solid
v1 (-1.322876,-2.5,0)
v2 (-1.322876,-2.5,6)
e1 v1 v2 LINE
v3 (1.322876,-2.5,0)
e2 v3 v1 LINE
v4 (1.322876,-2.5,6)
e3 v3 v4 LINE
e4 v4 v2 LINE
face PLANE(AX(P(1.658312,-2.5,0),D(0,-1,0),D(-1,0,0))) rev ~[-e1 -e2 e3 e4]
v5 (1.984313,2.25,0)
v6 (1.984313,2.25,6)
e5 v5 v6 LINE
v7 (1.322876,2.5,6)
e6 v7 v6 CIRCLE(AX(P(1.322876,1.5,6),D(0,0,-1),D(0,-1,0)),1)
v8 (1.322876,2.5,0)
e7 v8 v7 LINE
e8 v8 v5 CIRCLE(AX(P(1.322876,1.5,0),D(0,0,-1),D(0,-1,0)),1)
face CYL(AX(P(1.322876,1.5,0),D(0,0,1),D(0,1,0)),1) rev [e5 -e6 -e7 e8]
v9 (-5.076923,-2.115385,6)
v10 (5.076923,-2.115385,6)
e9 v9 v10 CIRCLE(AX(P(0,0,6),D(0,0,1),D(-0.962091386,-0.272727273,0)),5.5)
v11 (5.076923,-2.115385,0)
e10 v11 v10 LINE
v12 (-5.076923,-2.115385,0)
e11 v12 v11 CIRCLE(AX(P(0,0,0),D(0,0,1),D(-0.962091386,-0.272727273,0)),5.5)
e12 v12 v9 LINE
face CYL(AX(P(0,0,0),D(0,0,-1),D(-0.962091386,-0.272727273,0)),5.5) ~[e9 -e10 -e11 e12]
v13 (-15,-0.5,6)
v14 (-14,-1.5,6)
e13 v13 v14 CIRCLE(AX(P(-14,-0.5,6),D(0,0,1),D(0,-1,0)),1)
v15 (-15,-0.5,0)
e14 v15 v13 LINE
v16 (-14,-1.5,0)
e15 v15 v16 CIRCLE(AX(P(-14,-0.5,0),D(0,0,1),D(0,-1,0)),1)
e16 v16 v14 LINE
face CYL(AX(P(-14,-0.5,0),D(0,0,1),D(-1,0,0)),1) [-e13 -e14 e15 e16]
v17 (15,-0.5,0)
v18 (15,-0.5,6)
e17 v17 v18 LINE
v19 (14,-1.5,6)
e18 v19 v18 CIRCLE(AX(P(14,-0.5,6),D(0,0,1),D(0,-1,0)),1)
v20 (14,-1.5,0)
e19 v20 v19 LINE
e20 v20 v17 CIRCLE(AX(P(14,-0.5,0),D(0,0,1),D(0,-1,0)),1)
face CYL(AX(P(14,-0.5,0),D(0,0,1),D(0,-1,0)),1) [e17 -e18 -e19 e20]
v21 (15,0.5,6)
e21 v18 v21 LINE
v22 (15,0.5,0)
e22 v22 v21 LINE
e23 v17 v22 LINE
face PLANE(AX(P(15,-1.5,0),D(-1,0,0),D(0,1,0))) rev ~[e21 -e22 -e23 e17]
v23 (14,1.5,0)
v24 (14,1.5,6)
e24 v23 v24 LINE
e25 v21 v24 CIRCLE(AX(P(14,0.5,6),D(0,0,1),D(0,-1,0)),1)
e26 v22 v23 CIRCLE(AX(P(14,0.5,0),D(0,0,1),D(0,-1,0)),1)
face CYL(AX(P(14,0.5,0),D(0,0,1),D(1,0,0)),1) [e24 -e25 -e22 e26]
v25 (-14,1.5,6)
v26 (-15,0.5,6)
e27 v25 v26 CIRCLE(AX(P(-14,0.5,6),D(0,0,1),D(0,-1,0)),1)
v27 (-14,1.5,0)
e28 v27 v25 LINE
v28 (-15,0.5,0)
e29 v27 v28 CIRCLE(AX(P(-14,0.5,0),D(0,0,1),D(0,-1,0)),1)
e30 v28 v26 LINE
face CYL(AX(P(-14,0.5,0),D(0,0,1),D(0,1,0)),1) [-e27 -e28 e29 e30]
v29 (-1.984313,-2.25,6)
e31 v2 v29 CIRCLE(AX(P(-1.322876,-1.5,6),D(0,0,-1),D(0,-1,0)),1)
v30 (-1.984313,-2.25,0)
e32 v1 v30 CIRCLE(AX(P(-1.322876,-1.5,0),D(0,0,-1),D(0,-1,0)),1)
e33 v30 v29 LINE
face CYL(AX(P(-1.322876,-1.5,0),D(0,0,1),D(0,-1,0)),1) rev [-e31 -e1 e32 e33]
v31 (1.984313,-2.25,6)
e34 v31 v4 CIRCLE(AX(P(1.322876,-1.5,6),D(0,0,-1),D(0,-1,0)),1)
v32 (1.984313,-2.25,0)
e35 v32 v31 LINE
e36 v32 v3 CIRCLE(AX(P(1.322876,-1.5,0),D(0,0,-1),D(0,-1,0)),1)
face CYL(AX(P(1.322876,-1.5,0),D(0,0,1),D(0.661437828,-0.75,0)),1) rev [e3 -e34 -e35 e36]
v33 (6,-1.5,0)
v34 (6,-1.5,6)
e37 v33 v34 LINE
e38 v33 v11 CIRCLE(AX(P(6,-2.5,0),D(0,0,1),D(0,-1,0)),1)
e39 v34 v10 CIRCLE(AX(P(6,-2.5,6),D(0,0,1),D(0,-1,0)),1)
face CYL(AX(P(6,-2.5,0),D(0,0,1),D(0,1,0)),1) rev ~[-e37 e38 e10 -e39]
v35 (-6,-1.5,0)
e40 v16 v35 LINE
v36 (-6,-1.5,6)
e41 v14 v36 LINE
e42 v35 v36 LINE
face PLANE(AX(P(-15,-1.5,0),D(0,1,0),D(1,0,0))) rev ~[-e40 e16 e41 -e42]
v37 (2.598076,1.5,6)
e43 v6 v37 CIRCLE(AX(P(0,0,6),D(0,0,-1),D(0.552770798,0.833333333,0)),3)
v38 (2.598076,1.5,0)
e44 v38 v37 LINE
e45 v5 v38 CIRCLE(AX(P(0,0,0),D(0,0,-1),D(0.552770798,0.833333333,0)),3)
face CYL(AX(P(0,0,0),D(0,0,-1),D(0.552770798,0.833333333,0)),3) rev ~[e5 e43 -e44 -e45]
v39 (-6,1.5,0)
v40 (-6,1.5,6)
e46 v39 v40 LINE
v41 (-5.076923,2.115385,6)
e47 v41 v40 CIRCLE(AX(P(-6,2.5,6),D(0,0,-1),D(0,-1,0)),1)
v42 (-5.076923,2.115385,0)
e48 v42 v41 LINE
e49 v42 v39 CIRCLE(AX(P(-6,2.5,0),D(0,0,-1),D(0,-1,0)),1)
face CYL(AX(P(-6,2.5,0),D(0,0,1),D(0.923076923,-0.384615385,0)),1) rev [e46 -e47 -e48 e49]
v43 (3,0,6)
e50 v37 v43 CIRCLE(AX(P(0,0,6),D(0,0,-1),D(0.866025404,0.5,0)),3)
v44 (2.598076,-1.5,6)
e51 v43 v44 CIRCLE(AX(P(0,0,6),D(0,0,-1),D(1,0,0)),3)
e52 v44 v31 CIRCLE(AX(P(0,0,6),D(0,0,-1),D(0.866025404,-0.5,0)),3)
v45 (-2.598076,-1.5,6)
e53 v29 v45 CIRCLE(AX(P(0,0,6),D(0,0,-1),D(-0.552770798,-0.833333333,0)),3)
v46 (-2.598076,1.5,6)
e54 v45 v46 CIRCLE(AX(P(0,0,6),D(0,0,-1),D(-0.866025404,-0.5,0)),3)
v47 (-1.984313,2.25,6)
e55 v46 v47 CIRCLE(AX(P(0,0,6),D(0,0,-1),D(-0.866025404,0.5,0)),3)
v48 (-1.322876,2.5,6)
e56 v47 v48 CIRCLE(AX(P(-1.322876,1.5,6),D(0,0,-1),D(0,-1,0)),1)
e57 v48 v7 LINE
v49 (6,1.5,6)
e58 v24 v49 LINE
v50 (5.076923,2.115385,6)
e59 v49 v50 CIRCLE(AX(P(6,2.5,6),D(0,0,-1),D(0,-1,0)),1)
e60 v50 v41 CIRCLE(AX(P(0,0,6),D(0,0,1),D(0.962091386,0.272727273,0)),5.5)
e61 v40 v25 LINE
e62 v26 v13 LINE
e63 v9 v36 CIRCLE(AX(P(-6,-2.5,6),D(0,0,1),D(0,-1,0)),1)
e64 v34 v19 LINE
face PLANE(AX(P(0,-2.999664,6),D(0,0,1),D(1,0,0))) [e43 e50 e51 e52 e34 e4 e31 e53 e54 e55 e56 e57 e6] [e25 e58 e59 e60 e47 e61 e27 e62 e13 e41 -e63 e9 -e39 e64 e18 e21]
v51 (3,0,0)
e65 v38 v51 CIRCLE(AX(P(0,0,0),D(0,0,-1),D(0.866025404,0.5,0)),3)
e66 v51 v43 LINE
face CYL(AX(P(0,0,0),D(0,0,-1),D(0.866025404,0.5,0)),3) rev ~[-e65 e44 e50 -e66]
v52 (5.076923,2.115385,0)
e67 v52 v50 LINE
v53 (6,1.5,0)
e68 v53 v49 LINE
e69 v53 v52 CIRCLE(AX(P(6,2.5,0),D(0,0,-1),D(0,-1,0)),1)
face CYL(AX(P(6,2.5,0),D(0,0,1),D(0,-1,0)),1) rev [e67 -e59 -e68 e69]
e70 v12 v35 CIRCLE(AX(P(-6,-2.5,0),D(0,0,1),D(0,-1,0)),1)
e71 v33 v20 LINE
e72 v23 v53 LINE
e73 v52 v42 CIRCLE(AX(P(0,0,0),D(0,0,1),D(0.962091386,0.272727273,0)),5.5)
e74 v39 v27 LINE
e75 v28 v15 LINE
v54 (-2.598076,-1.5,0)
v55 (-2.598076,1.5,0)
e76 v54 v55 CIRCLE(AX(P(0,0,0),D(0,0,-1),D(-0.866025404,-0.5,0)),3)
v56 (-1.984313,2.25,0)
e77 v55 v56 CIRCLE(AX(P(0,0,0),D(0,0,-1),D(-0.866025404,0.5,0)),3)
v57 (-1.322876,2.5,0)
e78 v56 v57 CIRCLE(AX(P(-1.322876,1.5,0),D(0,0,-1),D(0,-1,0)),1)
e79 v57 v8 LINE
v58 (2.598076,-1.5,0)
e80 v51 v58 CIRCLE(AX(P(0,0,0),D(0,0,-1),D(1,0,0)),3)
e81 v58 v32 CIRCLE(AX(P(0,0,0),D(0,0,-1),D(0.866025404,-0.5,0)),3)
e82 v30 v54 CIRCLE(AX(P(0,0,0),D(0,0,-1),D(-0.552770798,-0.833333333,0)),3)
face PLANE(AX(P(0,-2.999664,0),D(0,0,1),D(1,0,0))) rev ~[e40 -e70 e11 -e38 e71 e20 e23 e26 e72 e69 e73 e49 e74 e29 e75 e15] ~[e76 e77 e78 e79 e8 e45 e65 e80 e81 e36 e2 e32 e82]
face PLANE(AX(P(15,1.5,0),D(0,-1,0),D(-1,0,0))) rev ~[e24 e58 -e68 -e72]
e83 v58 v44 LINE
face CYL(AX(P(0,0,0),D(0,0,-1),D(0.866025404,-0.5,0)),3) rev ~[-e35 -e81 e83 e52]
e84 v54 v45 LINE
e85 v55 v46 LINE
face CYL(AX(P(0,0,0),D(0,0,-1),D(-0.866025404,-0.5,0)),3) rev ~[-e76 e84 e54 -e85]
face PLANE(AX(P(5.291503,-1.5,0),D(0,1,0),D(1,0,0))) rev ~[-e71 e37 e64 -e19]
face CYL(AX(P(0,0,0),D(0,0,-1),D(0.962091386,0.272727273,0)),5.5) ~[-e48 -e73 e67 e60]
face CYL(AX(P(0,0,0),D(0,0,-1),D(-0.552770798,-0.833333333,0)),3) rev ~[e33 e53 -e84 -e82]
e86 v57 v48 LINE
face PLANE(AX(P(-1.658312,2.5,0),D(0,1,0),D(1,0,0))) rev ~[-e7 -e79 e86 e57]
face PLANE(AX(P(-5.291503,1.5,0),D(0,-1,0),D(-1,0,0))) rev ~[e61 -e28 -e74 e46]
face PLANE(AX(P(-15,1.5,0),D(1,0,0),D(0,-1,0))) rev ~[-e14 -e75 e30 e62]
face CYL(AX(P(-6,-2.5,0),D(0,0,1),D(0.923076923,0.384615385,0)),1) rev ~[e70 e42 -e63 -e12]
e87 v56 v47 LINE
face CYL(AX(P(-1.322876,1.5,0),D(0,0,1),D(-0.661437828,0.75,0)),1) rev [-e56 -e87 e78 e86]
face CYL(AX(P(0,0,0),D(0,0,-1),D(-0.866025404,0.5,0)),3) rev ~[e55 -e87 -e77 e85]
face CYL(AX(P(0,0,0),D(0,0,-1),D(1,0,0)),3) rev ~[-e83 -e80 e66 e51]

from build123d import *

# Parameters (mm, degrees)
F1_DEPTH = 6
F2_R     = 1
F3_R     = 1


with BuildPart() as f1:
    # F0 (on Top) → F1 (new body)
    with BuildSketch(Plane.XY):
        with BuildLine():
            ThreePointArc((-5.2915026221, -1.5), (0, -5.5), (5.2915026221, -1.5))
            Line((5.2915026221, -1.5), (2.5980762114, -1.5))
            ThreePointArc((2.5980762114, -1.5), (2.1861406616, -2.0544558909), (1.6583123952, -2.5))
            ThreePointArc((1.6583123952, -2.5), (0, -3), (-1.6583123952, -2.5))
            ThreePointArc((-1.6583123952, -2.5), (-2.1861406616, -2.0544558909), (-2.5980762114, -1.5))
            Line((-2.5980762114, -1.5), (-5.2915026221, -1.5))
        make_face()
        with BuildLine():
            ThreePointArc((-5.2915026221, -1.5), (-5.5, 0), (-5.2915026221, 1.5))
            Line((-5.2915026221, 1.5), (-15, 1.5))
            Line((-15, 1.5), (-15, -1.5))
            Line((-15, -1.5), (-5.2915026221, -1.5))
        make_face()
        with BuildLine():
            Line((-2.5980762114, 1.5), (-5.2915026221, 1.5))
            ThreePointArc((-5.2915026221, 1.5), (-5.5, 0), (-5.2915026221, -1.5))
            Line((-5.2915026221, -1.5), (-2.5980762114, -1.5))
            ThreePointArc((-2.5980762114, -1.5), (-3, 0), (-2.5980762114, 1.5))
        make_face()
        with BuildLine():
            ThreePointArc((5.2915026221, 1.5), (5.4476262914, 0.7572105316), (5.5, 0))
            ThreePointArc((5.5, 0), (5.4476262914, -0.7572105316), (5.2915026221, -1.5))
            Line((5.2915026221, -1.5), (15, -1.5))
            Line((15, -1.5), (15, 1.5))
            Line((15, 1.5), (5.2915026221, 1.5))
        make_face()
        with BuildLine():
            ThreePointArc((5.2915026221, -1.5), (5.4476262914, -0.7572105316), (5.5, 0))
            ThreePointArc((5.5, 0), (5.4476262914, 0.7572105316), (5.2915026221, 1.5))
            Line((5.2915026221, 1.5), (2.5980762114, 1.5))
            ThreePointArc((2.5980762114, 1.5), (2.8977774789, 0.7764571353), (3, 0))
            ThreePointArc((3, 0), (2.8977774789, -0.7764571353), (2.5980762114, -1.5))
            Line((2.5980762114, -1.5), (5.2915026221, -1.5))
        make_face()
        with BuildLine():
            Line((2.5980762114, 1.5), (5.2915026221, 1.5))
            ThreePointArc((5.2915026221, 1.5), (0, 5.5), (-5.2915026221, 1.5))
            Line((-5.2915026221, 1.5), (-2.5980762114, 1.5))
            ThreePointArc((-2.5980762114, 1.5), (-2.1861406616, 2.0544558909), (-1.6583123952, 2.5))
            ThreePointArc((-1.6583123952, 2.5), (0, 3), (1.6583123952, 2.5))
            ThreePointArc((1.6583123952, 2.5), (2.1861406616, 2.0544558909), (2.5980762114, 1.5))
        make_face()
        with BuildLine():
            Line((-1.6583123952, 2.5), (1.6583123952, 2.5))
            ThreePointArc((1.6583123952, 2.5), (0, 3), (-1.6583123952, 2.5))
        make_face()
        with BuildLine():
            ThreePointArc((-1.6583123952, -2.5), (0, -3), (1.6583123952, -2.5))
            Line((1.6583123952, -2.5), (-1.6583123952, -2.5))
        make_face()
    extrude(amount=F1_DEPTH)

    # F2
    f2_edges = [f1.edges().sort_by_distance(p)[0] for p in [
        (15, -1.5, 3),
        (-15, -1.5, 3),
        (15, 1.5, 3),
        (-15, 1.5, 3),
    ]]
    fillet(f2_edges, radius=F2_R)

    # F3
    f3_edges = [f1.edges().sort_by_distance(p)[0] for p in [
        (5.291503, -1.5, 3),
        (-5.291503, -1.5, 3),
        (-5.291503, 1.5, 3),
        (5.291503, 1.5, 3),
        (-1.658312, 2.5, 3),
        (1.658312, -2.5, 3),
        (1.658312, 2.5, 3),
        (-1.658312, -2.5, 3),
    ]]
    fillet(f3_edges, radius=F3_R)


solid = f1.part
